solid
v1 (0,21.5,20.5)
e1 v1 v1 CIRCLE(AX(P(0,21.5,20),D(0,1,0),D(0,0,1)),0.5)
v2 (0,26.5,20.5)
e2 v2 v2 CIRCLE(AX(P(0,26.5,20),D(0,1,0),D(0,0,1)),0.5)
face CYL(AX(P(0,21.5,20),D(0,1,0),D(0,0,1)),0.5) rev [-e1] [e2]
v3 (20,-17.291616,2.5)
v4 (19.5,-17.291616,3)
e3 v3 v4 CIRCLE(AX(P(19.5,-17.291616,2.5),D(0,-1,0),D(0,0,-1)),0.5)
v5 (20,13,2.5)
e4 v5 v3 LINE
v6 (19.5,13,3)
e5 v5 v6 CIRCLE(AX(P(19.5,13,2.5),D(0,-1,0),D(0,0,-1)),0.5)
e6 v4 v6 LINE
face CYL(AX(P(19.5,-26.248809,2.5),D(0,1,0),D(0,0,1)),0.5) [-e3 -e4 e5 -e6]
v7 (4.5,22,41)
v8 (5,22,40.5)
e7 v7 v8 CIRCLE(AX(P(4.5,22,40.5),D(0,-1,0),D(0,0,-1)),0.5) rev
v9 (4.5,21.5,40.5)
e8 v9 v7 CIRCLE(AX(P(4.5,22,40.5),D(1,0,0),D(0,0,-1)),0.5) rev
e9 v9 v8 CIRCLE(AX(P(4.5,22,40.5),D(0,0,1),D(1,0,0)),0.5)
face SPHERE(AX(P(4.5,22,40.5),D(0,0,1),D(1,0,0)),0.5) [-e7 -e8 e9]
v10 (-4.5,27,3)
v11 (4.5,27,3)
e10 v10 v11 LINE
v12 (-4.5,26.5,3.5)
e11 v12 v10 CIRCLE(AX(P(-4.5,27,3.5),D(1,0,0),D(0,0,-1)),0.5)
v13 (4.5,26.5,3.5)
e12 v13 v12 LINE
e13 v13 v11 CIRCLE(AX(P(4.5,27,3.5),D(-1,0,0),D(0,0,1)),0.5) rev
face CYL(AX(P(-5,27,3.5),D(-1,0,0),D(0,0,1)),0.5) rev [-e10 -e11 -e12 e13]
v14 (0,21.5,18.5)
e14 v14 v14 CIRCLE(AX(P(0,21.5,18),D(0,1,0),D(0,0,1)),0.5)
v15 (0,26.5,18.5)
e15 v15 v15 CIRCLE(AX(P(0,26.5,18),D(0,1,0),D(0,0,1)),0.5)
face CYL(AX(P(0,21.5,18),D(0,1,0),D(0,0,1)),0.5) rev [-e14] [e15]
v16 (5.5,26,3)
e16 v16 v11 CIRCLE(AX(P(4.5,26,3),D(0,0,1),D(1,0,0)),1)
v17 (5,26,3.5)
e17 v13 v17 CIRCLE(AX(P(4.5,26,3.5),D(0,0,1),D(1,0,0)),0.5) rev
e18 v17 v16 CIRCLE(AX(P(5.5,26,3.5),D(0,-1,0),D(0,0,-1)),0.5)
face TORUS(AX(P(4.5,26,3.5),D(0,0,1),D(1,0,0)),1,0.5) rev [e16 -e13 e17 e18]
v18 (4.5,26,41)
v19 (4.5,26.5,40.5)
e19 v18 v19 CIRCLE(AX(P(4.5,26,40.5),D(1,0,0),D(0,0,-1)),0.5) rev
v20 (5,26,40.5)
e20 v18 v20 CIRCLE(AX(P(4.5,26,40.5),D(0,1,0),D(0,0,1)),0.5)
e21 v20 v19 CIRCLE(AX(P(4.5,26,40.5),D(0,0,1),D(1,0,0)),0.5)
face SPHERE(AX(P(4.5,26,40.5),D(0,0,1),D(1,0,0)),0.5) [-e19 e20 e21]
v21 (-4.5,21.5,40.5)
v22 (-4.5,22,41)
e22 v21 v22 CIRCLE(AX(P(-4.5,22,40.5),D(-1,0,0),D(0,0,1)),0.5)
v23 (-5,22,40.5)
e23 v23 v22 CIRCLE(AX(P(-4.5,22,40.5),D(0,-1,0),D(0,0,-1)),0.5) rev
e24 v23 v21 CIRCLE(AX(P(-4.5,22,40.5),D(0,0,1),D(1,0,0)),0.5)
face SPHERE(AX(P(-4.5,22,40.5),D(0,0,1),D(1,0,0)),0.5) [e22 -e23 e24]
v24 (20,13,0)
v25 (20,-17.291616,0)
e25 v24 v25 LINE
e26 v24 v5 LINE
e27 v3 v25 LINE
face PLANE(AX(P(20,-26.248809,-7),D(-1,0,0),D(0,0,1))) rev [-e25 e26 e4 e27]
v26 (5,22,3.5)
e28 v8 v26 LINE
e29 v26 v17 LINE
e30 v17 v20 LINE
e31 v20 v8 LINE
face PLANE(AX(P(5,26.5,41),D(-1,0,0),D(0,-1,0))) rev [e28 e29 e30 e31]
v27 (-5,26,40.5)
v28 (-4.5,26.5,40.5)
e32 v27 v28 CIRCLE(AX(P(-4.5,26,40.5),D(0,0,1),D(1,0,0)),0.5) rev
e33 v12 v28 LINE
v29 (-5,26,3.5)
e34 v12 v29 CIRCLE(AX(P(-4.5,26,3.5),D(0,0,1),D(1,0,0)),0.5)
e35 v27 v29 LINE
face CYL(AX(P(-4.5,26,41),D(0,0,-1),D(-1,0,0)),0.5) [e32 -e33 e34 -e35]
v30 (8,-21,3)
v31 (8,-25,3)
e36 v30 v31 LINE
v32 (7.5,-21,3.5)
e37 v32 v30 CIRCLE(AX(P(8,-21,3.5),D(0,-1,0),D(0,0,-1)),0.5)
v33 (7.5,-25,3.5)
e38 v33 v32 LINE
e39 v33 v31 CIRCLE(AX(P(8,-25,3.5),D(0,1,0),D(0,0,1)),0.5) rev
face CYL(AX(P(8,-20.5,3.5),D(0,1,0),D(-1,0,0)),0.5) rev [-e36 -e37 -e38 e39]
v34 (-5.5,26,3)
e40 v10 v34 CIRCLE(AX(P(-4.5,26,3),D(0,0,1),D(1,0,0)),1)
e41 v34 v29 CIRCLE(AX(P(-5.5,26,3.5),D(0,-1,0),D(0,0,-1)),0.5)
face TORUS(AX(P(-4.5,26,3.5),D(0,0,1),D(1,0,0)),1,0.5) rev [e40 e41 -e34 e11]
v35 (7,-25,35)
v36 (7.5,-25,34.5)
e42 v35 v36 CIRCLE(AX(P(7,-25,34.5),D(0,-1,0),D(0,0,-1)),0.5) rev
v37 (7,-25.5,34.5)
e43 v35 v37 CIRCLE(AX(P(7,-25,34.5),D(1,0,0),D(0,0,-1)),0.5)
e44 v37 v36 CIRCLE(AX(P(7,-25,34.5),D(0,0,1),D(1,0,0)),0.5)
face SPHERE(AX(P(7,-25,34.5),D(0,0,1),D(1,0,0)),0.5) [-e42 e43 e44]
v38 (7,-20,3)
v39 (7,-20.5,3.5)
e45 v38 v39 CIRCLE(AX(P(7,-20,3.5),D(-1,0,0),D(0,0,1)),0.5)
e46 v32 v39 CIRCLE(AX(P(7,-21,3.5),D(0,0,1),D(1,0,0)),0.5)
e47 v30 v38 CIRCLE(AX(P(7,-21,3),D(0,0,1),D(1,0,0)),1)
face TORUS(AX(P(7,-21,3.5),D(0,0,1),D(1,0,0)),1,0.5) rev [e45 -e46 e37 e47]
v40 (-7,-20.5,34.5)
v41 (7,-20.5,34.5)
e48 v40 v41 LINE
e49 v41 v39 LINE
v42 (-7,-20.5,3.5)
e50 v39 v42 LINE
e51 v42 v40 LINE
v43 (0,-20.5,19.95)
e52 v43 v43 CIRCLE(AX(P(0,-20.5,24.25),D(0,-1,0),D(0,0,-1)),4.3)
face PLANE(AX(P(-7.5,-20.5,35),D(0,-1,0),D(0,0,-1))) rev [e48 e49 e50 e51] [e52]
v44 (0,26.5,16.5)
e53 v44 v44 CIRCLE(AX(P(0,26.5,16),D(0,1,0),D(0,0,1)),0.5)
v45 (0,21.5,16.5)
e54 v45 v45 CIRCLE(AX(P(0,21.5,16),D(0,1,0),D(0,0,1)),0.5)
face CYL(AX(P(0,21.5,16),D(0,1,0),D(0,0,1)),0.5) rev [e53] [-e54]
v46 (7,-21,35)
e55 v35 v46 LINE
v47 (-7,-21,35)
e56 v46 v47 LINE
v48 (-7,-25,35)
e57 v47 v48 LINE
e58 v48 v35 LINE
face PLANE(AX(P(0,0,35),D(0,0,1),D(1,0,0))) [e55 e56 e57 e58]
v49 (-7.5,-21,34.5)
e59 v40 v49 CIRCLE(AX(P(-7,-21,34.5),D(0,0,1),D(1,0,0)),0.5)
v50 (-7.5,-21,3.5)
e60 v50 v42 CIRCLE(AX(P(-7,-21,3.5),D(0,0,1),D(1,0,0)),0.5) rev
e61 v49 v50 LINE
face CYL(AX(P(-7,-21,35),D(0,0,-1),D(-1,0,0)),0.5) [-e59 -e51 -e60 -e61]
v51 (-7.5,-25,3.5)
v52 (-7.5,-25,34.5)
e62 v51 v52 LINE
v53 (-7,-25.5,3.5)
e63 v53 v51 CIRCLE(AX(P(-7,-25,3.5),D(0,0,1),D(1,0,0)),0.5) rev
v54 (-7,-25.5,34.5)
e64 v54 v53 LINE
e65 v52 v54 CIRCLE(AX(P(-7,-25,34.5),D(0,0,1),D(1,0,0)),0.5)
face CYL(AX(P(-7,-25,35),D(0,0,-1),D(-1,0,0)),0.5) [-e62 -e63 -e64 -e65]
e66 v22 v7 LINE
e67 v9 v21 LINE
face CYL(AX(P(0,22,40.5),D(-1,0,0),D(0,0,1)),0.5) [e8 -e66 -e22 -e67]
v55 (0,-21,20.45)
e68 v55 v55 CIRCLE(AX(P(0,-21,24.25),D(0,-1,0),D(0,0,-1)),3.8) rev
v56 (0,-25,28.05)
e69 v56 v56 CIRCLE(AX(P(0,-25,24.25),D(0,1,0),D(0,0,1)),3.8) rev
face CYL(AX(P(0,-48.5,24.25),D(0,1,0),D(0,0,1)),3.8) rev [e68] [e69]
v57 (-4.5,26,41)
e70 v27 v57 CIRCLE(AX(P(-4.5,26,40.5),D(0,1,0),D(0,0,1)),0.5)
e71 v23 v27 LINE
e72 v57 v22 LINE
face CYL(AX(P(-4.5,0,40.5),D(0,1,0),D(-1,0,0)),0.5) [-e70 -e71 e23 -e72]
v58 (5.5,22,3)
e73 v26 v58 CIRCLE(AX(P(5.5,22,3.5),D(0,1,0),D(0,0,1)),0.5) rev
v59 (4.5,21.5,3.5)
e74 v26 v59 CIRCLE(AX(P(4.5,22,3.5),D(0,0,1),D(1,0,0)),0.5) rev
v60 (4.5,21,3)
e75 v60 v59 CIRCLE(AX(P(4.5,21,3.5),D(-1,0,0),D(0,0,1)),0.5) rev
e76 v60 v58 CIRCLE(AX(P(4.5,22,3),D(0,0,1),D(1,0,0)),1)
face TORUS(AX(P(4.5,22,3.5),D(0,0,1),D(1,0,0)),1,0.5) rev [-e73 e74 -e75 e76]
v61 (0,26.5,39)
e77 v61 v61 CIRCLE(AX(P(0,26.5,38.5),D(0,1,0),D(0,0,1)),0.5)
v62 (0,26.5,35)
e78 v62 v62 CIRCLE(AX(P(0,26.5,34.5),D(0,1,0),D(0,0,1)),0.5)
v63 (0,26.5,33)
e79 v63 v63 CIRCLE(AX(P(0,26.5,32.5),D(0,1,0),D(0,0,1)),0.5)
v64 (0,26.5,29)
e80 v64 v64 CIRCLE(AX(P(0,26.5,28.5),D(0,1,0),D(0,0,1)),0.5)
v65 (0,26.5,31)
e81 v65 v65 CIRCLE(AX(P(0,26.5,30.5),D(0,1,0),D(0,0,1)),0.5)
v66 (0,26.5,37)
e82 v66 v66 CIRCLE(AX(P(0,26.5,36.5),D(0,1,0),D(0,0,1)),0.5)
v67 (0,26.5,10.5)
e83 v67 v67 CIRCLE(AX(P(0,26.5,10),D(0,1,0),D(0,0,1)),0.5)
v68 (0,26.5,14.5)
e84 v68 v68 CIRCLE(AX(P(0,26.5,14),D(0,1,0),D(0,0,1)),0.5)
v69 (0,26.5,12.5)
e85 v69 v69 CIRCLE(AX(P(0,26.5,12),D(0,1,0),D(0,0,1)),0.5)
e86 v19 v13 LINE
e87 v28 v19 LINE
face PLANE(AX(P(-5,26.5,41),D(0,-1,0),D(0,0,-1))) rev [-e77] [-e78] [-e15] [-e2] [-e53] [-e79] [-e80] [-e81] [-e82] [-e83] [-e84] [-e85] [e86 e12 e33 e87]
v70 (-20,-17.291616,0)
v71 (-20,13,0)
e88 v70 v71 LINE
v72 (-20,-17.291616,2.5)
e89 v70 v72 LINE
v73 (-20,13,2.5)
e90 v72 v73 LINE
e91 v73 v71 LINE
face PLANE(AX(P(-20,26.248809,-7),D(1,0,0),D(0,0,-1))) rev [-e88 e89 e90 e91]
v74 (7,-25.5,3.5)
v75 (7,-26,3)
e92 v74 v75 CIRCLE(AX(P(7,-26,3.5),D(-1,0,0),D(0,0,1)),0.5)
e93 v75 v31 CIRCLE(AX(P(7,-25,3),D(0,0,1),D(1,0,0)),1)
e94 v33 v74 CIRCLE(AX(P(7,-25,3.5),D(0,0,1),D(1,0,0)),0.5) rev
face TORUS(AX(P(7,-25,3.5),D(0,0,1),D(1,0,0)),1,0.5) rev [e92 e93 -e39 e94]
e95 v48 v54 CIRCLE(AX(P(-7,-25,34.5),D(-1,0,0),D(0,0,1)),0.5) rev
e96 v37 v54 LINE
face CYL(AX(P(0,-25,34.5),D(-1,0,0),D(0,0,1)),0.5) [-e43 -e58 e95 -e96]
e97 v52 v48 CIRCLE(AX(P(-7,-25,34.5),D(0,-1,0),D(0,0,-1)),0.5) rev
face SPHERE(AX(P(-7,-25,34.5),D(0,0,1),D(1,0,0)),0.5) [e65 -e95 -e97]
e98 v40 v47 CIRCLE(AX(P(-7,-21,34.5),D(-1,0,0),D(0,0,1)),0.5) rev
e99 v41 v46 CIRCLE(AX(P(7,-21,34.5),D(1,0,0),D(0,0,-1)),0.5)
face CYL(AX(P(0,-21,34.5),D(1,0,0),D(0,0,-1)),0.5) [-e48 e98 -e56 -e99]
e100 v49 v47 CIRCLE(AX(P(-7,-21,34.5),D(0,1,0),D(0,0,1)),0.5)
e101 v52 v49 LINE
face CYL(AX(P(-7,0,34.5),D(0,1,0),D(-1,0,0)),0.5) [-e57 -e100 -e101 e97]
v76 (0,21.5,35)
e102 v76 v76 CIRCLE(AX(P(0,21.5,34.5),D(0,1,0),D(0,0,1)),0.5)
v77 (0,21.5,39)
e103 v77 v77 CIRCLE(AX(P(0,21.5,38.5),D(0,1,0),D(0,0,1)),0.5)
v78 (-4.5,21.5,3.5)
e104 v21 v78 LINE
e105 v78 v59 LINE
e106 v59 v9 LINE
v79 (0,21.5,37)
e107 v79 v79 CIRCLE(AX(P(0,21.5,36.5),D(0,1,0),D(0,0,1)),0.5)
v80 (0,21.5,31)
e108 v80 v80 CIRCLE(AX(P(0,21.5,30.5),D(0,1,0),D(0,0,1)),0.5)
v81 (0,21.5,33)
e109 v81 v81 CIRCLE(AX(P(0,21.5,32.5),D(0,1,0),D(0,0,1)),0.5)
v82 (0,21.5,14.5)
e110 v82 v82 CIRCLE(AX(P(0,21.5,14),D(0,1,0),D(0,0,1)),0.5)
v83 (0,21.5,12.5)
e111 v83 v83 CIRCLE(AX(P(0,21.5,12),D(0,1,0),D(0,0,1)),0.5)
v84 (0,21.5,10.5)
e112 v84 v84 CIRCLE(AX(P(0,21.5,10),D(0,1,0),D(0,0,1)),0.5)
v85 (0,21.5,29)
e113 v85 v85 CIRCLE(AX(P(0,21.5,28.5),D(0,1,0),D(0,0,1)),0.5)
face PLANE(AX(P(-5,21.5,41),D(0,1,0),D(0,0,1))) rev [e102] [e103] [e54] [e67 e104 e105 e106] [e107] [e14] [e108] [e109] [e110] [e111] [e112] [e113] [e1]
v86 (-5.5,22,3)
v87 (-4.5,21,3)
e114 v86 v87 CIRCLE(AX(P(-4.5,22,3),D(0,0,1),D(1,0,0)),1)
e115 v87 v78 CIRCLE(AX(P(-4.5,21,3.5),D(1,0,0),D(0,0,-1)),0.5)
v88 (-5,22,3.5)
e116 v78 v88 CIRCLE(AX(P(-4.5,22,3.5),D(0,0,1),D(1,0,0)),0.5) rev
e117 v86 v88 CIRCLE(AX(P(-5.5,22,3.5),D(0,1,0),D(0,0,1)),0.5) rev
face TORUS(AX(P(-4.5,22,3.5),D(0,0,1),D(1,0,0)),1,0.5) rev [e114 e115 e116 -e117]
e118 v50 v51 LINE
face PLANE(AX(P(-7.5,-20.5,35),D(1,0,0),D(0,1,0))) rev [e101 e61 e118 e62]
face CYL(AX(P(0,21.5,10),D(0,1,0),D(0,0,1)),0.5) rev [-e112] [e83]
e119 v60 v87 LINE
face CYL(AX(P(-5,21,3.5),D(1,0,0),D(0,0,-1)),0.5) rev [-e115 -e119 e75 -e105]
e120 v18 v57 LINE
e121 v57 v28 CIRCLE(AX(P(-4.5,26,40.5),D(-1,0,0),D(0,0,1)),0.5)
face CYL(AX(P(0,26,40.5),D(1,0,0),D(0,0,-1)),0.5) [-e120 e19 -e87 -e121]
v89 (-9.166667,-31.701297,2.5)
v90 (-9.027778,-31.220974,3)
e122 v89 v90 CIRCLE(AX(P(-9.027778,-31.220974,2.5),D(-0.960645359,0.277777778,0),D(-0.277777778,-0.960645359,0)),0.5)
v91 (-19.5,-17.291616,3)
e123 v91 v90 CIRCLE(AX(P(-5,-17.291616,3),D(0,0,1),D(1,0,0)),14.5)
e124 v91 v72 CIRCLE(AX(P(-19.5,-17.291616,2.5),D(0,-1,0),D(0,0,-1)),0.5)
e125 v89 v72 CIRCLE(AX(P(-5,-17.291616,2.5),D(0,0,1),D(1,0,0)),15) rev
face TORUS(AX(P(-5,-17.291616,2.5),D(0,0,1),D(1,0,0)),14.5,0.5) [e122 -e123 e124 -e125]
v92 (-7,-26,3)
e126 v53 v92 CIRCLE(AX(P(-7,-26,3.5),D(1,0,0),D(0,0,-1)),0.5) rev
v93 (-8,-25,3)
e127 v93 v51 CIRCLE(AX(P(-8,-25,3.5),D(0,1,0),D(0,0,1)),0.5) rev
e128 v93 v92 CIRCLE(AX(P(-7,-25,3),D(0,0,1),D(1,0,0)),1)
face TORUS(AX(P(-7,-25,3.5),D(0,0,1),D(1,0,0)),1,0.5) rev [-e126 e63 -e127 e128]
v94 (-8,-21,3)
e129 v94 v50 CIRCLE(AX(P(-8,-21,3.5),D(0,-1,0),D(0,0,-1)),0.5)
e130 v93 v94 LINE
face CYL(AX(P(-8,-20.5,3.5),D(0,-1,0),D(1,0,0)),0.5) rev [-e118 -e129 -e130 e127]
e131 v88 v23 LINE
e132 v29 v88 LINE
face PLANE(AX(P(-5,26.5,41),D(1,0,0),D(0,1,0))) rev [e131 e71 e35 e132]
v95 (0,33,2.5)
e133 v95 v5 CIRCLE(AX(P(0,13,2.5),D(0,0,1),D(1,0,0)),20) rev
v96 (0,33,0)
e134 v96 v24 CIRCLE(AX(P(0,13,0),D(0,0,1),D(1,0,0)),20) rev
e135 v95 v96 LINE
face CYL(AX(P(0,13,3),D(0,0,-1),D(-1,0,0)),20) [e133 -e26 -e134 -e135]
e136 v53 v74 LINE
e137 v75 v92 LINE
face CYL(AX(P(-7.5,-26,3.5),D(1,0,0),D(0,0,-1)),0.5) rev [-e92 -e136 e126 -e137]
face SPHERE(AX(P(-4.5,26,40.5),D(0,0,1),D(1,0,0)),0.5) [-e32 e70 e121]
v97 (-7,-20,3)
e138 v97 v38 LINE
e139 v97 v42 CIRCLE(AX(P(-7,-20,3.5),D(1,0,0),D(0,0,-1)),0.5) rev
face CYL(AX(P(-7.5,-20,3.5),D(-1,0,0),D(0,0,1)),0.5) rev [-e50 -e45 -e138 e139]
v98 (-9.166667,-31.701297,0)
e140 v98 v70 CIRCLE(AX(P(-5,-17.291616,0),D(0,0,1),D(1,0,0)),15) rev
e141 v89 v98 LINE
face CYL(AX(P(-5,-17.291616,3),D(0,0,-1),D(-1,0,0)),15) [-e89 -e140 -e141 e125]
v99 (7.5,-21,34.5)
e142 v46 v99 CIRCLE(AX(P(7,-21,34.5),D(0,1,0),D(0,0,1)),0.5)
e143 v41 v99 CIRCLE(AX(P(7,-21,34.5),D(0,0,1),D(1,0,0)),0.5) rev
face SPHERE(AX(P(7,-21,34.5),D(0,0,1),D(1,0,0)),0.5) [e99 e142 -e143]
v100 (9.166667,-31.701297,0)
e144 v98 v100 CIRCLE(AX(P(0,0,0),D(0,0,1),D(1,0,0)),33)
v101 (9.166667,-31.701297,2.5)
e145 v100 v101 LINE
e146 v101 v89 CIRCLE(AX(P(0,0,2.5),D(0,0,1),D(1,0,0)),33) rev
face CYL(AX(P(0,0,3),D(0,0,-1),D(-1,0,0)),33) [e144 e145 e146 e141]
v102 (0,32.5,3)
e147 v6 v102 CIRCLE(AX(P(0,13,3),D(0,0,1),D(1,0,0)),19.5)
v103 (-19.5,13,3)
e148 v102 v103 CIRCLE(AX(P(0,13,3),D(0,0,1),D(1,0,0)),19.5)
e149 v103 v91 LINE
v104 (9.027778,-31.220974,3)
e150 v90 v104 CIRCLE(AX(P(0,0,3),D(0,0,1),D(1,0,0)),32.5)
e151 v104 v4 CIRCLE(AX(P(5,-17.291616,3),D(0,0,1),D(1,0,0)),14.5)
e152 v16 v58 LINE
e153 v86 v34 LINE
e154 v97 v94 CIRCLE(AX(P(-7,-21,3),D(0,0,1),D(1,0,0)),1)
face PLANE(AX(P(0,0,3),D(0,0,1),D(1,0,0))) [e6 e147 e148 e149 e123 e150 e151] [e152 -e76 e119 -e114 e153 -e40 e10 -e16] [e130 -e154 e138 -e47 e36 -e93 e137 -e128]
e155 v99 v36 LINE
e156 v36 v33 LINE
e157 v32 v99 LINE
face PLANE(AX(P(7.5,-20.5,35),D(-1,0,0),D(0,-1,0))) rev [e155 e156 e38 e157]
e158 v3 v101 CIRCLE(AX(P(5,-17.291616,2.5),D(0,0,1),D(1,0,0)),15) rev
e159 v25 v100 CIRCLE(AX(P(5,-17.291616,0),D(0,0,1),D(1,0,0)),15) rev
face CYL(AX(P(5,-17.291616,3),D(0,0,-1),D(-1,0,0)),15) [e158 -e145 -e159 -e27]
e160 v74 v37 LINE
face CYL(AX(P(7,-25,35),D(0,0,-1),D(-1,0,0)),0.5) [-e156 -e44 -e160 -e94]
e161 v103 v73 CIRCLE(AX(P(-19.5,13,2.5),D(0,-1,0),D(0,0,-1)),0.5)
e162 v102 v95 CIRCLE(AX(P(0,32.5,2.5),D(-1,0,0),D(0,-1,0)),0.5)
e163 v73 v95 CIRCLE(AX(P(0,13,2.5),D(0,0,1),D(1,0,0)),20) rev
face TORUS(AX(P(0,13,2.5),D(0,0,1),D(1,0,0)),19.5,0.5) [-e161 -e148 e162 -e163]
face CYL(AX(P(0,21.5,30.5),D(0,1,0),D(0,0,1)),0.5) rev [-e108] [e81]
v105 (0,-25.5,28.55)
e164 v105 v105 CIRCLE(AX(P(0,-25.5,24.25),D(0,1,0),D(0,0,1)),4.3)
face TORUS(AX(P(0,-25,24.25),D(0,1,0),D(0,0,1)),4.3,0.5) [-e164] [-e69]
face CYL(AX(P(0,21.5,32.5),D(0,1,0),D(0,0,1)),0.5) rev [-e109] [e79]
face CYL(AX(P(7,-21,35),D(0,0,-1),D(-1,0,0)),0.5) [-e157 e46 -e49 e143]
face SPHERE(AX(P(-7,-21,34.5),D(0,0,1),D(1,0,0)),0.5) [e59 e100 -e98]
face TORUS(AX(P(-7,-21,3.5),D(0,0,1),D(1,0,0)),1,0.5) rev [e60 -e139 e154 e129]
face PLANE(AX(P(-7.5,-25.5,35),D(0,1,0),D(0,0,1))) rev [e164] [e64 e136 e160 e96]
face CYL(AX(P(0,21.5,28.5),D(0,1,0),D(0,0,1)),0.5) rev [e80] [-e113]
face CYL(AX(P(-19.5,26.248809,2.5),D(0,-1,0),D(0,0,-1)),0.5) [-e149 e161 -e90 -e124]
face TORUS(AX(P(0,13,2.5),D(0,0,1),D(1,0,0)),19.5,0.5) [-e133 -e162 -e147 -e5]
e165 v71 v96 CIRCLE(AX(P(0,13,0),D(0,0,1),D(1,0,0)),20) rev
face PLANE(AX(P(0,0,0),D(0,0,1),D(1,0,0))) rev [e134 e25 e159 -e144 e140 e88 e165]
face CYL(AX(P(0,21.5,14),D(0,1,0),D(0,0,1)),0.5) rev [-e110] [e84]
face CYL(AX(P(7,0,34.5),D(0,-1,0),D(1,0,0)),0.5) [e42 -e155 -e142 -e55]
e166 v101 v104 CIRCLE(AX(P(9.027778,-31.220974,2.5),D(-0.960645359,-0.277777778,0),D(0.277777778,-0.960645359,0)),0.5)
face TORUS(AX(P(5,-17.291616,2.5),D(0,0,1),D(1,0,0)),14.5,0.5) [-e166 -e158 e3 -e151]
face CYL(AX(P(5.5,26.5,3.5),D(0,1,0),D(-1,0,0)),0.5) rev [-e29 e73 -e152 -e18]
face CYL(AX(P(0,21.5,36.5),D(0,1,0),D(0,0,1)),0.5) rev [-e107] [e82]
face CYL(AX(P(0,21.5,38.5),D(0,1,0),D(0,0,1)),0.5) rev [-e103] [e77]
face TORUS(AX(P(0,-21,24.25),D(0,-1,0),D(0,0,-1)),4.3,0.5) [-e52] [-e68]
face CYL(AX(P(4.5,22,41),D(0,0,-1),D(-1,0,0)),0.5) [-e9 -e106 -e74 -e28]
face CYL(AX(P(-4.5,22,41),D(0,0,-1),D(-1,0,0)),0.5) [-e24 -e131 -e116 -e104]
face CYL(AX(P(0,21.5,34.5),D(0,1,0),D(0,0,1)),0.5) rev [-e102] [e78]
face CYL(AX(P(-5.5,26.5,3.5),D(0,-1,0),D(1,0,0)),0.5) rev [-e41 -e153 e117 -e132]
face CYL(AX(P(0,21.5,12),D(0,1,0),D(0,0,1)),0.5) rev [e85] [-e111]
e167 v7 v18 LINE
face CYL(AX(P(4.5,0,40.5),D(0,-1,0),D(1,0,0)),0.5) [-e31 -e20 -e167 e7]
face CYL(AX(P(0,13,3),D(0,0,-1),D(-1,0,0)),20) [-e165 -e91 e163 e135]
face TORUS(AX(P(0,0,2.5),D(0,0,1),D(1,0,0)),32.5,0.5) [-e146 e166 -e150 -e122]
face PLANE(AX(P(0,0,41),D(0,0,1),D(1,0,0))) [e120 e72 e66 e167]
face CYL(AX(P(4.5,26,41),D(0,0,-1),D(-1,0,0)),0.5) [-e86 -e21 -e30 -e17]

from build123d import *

# Parameters (mm, degrees)
SKETCH1_R           = 33
BOSS_EXTRUDE1_DEPTH = 3
CUT_EXTRUDE3_START  = -10
CUT_EXTRUDE3_DEPTH  = 10
FILLET2_R           = 20
FILLET3_R           = 15
SKETCH2_W           = 10
SKETCH2_H           = 5
BOSS_EXTRUDE2_DEPTH = 38
SKETCH3_R           = 0.5
CUT_EXTRUDE1_DEPTH  = 5
SKETCH4_W           = 15
SKETCH4_H           = 5
BOSS_EXTRUDE3_DEPTH = 32
SKETCH5_R           = 3.8
CUT_EXTRUDE2_DEPTH  = 28
FILLET4_R           = 0.5


with BuildPart() as part:
    # Sketch1 → Boss-Extrude1 (new body)
    with BuildSketch(Plane.XY):
        Circle(SKETCH1_R)
    extrude(amount=BOSS_EXTRUDE1_DEPTH)

    # Sketch6 → Cut-Extrude3 (cut)
    with BuildSketch(Plane.XY.offset(3).offset(CUT_EXTRUDE3_START)):
        with BuildLine():
            Line((-20, 26.248809497), (-20, -26.248809497))
            ThreePointArc((-20, -26.248809497), (-33, 0), (-20, 26.248809497))
        make_face()
        with BuildLine():
            Line((20, -26.248809497), (20, 26.248809497))
            ThreePointArc((20, 26.248809497), (33, 0), (20, -26.248809497))
        make_face()
    extrude(amount=CUT_EXTRUDE3_DEPTH, mode=Mode.SUBTRACT)

    # Fillet2
    fillet2_edges = [part.edges().sort_by_distance(p)[0] for p in [
        (-20, 26.248809497, 1.5),
        (20, 26.248809497, 1.5),
    ]]
    fillet(fillet2_edges, radius=FILLET2_R - 0.0001)  # a hair under: the kernel refuses the full size

    # Fillet3
    fillet3_edges = [part.edges().sort_by_distance(p)[0] for p in [
        (-20, -26.248809497, 1.5),
        (20, -26.248809497, 1.5),
    ]]
    fillet(fillet3_edges, radius=FILLET3_R)

    # Sketch2 → Boss-Extrude2 (add)
    with BuildSketch(Plane.XY.offset(3)):
        with Locations((0, 24)):
            Rectangle(SKETCH2_W, SKETCH2_H)
    extrude(amount=BOSS_EXTRUDE2_DEPTH)

    # Sketch3 → Cut-Extrude1 (cut)
    with BuildSketch(Plane(origin=(0, 26.5, 0), x_dir=(1, 0, 0), z_dir=(0, 1, 0))):
        with Locations(Location((0, -10, 0), (0, 0, 270))):
            Circle(SKETCH3_R)
        with Locations(Location((0, -12, 0), (0, 0, 270))):
            Circle(SKETCH3_R)
        with Locations(Location((0, -14, 0), (0, 0, 270))):
            Circle(SKETCH3_R)
        with Locations(Location((0, -16, 0), (0, 0, 270))):
            Circle(SKETCH3_R)
        with Locations(Location((0, -18, 0), (0, 0, 270))):
            Circle(SKETCH3_R)
        with Locations(Location((0, -20, 0), (0, 0, 270))):
            Circle(SKETCH3_R)
        with Locations(Location((0, -38.5, 0), (0, 0, 270))):
            Circle(SKETCH3_R)
        with Locations(Location((0, -36.5, 0), (0, 0, 270))):
            Circle(SKETCH3_R)
        with Locations(Location((0, -34.5, 0), (0, 0, 270))):
            Circle(SKETCH3_R)
        with Locations(Location((0, -32.5, 0), (0, 0, 270))):
            Circle(SKETCH3_R)
        with Locations(Location((0, -30.5, 0), (0, 0, 270))):
            Circle(SKETCH3_R)
        with Locations(Location((0, -28.5, 0), (0, 0, 270))):
            Circle(SKETCH3_R)
    extrude(amount=-CUT_EXTRUDE1_DEPTH, mode=Mode.SUBTRACT)

    # Sketch4 → Boss-Extrude3 (add)
    with BuildSketch(Plane.XY.offset(3)):
        with Locations((0, -23)):
            Rectangle(SKETCH4_W, SKETCH4_H)
    extrude(amount=BOSS_EXTRUDE3_DEPTH)

    # Sketch5 → Cut-Extrude2 (cut)
    with BuildSketch(Plane(origin=(0, -20.5, 0), x_dir=(1, 0, 0), z_dir=(0, 1, 0))):
        with Locations(Location((0, -24.25, 0), (0, 0, 270))):
            Circle(SKETCH5_R)
    extrude(amount=-CUT_EXTRUDE2_DEPTH, mode=Mode.SUBTRACT)

    # Fillet4
    fillet4_edges = [part.edges().sort_by_distance(p)[0] for p in [
        (7.5, -23, 3),
        (7.5, -25.5, 19),
        (0, -20.5, 3),
        (7.5, -20.5, 19),
        (-7.5, -23, 3),
        (-7.5, -20.5, 19),
        (0, -25.5, 3),
        (-7.5, -25.5, 19),
        (7.5, -23, 35),
        (0, -20.5, 35),
        (-7.5, -23, 35),
        (0, -25.5, 35),
        (0, -25.5, 20.45),
        (0, -20.5, 20.45),
        (20, -2.145758233, 3),
        (14.142219305, 27.14211052, 3),
        (-14.142219305, 27.14211052, 3),
        (0, -33, 3),
        (-20, -2.145758233, 3),
        (-16.989578808, -26.305494654, 3),
        (16.989578808, -26.305494654, 3),
        (5, 24, 3),
        (5, 21.5, 22),
        (0, 26.5, 3),
        (5, 26.5, 22),
        (-5, 24, 3),
        (-5, 26.5, 22),
        (0, 21.5, 3),
        (-5, 21.5, 22),
        (5, 24, 41),
        (0, 26.5, 41),
        (-5, 24, 41),
        (0, 21.5, 41),
    ]]
    fillet(fillet4_edges, radius=FILLET4_R)


solid = part.part
